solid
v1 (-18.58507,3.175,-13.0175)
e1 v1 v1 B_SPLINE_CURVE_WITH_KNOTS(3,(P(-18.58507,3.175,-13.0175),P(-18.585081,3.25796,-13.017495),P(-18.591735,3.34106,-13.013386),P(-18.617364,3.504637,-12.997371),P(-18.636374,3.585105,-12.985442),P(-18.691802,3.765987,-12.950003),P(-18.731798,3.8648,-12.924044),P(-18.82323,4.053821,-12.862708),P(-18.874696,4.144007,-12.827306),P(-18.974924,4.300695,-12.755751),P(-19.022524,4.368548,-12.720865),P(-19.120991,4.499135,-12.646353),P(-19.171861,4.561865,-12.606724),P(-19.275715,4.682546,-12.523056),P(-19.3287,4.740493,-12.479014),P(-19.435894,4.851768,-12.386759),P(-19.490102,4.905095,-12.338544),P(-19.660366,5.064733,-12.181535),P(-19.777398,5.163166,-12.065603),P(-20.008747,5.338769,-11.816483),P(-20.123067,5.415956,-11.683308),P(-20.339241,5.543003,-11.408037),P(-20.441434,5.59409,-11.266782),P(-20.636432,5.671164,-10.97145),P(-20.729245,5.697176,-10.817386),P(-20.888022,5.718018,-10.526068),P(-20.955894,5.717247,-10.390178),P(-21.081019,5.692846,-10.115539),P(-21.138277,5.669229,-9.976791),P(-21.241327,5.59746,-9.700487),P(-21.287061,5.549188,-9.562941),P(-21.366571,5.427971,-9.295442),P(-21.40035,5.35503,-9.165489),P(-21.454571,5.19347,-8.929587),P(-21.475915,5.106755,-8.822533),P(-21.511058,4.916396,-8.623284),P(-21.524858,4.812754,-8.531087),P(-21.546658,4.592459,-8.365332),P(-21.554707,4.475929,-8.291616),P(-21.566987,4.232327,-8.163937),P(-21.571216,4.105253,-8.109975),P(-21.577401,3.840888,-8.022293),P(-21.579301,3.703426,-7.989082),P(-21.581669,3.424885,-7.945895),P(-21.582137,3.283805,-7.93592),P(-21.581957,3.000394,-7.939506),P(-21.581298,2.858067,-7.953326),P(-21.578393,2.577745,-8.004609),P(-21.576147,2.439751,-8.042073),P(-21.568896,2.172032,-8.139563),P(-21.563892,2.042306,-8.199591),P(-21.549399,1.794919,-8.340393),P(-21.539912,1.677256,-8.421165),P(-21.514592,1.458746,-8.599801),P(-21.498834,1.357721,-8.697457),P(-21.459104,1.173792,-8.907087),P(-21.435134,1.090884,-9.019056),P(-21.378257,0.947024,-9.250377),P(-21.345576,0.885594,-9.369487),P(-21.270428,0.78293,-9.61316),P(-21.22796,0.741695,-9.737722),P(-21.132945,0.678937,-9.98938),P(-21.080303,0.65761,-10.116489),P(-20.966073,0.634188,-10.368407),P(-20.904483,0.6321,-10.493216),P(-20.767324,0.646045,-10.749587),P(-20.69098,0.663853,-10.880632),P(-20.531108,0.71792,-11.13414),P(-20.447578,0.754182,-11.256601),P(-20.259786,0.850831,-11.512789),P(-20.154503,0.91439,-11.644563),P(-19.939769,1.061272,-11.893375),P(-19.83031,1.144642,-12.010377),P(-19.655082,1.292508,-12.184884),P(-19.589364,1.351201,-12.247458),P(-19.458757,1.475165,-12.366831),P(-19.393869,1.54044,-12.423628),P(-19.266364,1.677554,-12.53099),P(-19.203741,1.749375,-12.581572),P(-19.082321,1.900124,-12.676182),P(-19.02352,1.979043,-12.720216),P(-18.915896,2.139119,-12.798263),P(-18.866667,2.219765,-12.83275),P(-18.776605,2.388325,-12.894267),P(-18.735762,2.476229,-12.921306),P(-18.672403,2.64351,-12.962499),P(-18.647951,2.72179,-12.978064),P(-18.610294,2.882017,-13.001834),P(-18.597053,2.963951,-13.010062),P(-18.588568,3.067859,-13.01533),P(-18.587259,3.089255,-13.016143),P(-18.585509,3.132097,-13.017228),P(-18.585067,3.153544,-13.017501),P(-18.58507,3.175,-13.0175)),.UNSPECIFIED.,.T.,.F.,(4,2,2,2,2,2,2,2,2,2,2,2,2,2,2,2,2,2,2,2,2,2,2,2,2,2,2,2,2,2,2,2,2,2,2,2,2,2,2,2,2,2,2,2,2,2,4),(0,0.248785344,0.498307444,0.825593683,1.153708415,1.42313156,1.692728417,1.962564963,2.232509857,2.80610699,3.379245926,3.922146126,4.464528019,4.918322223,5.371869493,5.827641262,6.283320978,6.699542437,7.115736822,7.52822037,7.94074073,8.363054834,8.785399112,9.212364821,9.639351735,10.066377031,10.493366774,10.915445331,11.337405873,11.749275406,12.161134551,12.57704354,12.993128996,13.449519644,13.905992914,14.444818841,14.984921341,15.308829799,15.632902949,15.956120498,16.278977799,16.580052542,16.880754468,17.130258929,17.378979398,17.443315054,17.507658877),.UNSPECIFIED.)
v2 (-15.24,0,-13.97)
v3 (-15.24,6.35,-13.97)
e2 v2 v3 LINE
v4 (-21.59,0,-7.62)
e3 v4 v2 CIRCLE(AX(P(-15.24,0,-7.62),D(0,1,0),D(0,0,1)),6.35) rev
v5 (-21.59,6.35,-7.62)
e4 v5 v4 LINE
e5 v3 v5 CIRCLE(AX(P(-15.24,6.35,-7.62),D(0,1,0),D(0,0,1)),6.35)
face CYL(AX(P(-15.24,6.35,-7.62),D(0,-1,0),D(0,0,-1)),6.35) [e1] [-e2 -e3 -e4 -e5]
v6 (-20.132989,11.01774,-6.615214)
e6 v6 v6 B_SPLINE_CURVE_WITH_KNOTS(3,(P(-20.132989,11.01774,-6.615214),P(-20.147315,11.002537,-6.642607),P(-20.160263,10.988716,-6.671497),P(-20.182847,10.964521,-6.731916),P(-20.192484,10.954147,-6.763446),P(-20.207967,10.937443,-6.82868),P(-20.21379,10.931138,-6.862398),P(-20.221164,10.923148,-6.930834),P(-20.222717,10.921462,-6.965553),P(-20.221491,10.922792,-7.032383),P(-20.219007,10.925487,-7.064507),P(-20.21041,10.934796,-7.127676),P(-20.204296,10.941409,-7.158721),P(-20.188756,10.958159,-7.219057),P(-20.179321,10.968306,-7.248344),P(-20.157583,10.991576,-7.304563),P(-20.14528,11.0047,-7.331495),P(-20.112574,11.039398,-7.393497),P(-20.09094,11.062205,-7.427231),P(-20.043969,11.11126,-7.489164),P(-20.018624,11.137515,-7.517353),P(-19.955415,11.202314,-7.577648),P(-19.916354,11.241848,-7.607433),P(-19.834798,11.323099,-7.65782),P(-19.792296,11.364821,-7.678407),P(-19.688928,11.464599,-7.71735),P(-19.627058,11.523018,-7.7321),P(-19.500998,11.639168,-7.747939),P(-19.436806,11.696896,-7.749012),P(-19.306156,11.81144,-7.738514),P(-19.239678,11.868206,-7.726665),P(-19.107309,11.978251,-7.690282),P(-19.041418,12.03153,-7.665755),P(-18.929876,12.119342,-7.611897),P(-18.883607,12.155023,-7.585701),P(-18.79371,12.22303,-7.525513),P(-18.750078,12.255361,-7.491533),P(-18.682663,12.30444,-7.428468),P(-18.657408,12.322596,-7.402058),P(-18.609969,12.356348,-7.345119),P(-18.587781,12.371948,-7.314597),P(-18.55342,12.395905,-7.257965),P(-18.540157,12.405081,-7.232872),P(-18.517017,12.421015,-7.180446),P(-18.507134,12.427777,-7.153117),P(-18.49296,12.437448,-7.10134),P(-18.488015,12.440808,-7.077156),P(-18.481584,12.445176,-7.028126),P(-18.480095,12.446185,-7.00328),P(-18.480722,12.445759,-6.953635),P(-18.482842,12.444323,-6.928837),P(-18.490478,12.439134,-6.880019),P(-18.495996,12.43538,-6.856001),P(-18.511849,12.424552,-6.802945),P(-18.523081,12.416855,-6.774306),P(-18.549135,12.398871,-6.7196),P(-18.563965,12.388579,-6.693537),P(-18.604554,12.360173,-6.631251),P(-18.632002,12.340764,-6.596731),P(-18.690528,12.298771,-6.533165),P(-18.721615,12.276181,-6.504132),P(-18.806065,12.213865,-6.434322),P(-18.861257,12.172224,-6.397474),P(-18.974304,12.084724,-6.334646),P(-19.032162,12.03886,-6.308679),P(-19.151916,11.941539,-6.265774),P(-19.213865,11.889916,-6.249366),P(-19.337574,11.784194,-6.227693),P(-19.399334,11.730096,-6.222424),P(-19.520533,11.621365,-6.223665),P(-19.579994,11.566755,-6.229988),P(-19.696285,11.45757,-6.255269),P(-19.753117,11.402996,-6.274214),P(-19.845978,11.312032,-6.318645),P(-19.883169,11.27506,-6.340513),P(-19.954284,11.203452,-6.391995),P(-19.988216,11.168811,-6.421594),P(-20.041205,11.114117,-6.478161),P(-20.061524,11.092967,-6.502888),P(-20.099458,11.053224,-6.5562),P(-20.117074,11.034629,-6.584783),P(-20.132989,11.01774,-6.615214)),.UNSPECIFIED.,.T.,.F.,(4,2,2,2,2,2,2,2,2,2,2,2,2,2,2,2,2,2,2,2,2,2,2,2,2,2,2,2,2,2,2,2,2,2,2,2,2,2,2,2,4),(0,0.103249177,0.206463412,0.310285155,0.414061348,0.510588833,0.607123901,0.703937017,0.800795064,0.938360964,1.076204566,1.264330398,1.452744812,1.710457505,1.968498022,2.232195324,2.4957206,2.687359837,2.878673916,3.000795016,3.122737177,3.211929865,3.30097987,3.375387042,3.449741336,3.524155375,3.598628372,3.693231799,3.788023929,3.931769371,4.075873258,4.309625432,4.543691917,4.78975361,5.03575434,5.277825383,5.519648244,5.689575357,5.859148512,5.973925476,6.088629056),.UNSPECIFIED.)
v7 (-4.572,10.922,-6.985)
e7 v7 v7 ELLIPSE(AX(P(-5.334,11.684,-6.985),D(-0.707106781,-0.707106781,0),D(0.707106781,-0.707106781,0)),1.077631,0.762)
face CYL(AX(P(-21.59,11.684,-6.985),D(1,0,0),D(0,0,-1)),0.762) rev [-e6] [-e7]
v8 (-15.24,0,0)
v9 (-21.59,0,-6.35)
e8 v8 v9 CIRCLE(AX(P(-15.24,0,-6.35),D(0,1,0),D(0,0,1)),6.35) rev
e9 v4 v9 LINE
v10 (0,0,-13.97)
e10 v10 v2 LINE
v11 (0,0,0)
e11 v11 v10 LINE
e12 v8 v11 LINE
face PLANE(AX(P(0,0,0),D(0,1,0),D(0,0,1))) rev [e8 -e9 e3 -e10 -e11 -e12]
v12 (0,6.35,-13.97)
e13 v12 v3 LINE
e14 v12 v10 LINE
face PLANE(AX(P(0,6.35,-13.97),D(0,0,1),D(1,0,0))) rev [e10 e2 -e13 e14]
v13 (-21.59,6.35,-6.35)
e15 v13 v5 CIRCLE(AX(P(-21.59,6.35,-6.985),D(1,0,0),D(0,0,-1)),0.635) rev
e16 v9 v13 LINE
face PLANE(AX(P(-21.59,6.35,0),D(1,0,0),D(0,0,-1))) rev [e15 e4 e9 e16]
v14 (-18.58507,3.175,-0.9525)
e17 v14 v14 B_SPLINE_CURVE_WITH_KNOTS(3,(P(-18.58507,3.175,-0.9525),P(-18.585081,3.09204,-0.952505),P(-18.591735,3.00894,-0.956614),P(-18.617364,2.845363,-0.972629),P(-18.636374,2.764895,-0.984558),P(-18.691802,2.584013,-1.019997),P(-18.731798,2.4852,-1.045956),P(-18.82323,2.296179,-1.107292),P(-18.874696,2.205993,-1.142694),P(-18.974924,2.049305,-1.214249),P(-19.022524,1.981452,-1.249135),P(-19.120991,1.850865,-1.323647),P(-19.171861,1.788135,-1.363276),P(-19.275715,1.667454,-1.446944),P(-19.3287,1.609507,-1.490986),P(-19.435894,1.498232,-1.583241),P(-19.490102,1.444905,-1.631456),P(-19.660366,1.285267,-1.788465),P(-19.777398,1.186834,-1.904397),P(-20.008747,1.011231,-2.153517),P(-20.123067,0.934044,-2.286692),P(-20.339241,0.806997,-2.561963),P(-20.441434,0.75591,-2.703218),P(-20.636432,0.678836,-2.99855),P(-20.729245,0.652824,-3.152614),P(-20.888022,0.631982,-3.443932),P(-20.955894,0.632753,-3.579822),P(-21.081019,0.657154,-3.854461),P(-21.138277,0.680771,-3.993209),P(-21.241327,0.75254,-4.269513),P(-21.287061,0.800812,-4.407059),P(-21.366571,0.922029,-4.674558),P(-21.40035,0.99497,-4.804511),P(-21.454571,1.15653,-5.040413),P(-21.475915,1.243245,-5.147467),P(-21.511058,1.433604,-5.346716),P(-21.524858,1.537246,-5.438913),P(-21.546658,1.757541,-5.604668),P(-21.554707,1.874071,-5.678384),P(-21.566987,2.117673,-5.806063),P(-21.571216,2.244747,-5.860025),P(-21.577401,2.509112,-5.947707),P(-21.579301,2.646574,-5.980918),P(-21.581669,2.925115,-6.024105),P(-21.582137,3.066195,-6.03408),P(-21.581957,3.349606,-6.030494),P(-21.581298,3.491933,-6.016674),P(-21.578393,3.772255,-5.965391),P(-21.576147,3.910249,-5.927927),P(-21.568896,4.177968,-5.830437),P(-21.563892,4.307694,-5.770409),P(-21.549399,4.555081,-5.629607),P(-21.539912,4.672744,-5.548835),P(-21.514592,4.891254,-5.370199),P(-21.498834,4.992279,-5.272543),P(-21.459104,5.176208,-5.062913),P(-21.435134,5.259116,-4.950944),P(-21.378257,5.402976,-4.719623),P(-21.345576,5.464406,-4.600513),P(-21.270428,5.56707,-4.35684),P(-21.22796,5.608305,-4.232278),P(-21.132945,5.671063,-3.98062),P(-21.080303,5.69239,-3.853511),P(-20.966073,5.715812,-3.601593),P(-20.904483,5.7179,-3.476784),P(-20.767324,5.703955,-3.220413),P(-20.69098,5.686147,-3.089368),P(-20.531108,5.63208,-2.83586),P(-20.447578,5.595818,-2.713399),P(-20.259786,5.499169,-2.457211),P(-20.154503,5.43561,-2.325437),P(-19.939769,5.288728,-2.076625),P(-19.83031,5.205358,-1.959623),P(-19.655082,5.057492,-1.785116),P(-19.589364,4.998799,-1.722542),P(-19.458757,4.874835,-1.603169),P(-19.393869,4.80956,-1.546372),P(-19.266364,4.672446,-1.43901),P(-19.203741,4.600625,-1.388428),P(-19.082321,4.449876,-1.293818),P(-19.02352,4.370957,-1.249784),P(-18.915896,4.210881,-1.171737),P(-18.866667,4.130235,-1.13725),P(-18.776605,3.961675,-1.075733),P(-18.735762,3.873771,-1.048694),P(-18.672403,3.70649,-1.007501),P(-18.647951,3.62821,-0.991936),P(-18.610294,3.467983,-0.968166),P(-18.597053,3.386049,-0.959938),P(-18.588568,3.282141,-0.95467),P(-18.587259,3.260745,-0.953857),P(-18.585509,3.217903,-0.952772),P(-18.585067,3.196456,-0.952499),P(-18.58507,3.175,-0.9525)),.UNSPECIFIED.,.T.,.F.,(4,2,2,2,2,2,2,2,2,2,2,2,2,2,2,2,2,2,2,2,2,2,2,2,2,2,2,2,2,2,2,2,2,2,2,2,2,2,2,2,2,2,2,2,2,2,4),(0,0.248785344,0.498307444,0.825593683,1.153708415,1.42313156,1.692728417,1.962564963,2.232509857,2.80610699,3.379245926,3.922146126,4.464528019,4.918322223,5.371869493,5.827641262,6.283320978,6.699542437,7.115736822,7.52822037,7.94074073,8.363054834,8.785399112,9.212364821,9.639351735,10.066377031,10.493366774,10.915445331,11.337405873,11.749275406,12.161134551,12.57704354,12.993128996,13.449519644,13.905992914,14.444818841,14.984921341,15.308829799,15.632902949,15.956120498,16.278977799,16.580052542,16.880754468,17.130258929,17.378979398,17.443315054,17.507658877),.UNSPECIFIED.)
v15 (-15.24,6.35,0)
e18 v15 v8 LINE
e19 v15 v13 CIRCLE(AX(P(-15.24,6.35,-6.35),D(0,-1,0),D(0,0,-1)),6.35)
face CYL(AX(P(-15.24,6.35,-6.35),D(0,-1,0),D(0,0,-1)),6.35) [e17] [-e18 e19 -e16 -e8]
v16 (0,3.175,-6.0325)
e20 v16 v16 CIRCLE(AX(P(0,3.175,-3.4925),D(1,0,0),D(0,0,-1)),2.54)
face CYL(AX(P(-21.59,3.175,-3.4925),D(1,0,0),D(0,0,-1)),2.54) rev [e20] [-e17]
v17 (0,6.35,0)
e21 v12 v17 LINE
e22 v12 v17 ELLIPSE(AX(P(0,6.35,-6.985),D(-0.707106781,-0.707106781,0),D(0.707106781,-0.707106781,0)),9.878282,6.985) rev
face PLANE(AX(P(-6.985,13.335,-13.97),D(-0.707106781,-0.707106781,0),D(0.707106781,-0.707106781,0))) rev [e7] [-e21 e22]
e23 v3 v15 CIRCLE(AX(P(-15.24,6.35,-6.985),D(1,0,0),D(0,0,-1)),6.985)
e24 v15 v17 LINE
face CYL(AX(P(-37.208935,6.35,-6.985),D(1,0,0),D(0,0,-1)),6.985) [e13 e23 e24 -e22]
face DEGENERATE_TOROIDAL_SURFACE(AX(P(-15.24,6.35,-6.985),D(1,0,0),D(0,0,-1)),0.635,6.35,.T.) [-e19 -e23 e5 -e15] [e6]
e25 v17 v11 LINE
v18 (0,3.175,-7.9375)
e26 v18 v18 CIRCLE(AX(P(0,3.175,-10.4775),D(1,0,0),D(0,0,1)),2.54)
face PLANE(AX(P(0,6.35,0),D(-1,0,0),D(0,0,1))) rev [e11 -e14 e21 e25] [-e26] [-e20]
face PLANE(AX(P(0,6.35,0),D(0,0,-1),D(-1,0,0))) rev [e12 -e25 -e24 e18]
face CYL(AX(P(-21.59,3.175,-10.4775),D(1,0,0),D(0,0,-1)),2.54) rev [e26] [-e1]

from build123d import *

# Parameters (mm, degrees)
SKETCH1_W              = 21.59
SKETCH1_H              = 13.97
DEPTH_A_DEPTH          = 6.35
ROUND_EXTRUDE_DEPTH    = 21.59
ANGLE_CUT_DEPTH        = 29.967416609
STRING_HOLE_R          = 0.762
STRING_HOLE_CUT_DEPTH  = 29.967416609
ELASTIC_HOLES_R        = 2.54
ELASTIC_HOLE_CUT_DEPTH = 29.967416609
FILLET1_R              = 6.35


with BuildPart() as part:
    # Sketch1 → depth a (new body)
    with BuildSketch(Plane(origin=(0, 0, 0), x_dir=(1, 0, 0), z_dir=(0, 1, 0))):
        with Locations((-10.795, 6.985)):
            Rectangle(SKETCH1_W, SKETCH1_H)
    extrude(amount=DEPTH_A_DEPTH)

    # Sketch4 → round extrude (add)
    with BuildSketch(Plane(origin=(0, 0, 0), x_dir=(0, 0, -1), z_dir=(1, 0, 0))):
        with BuildLine():
            Line((0, 6.35), (13.97, 6.35))
            ThreePointArc((13.97, 6.35), (6.985, 13.335), (0, 6.35))
        make_face()
    extrude(amount=-ROUND_EXTRUDE_DEPTH)

    # Sketch5 → angle cut (cut, through all)
    with BuildSketch(Plane.XY):
        Polygon((0, 6.35), (0, 13.335), (-6.985, 13.335), align=None)
    extrude(amount=-ANGLE_CUT_DEPTH, mode=Mode.SUBTRACT)

    # string hole → string hole cut (cut, through all)
    with BuildSketch(Plane(origin=(0, 0, 0), x_dir=(0, 0, -1), z_dir=(1, 0, 0))):
        with Locations((6.985, 11.684)):
            Circle(STRING_HOLE_R)
    extrude(amount=-STRING_HOLE_CUT_DEPTH, mode=Mode.SUBTRACT)

    # elastic holes → elastic hole cut (cut, through all)
    with BuildSketch(Plane(origin=(0, 0, 0), x_dir=(0, 0, -1), z_dir=(1, 0, 0))):
        with Locations((3.4925, 3.175)):
            Circle(ELASTIC_HOLES_R)
        with Locations(Location((10.4775, 3.175, 0), (0, 0, 180))):
            Circle(ELASTIC_HOLES_R)
    extrude(amount=-ELASTIC_HOLE_CUT_DEPTH, mode=Mode.SUBTRACT)

    # Fillet1
    # the kernel refuses this fillet: 6.35 mm, written as the material it takes off along each edge
    with BuildSketch(Plane(origin=(-21.59, 6.35, -6.985), x_dir=(0, 0, -1), z_dir=(0, -1, 0))) as fillet1_piece_1:
        with BuildLine():
            CenterArc((6.985 - FILLET1_R, FILLET1_R), FILLET1_R, 270, 90)
            Line((6.985, FILLET1_R), (6.985, 0))
            Line((6.985, 0), (6.985 - FILLET1_R, 0))
        make_face()
    revolve(axis=Axis((-21.59, 6.35, -6.985), (1, 0, 0)), revolution_arc=180, mode=Mode.SUBTRACT)
    with BuildSketch(Plane(origin=(-21.59, -15.875, 0), x_dir=(1, 0, 0), z_dir=(0, 1, 0)), Plane(origin=(-21.59, -15.875, -13.97), x_dir=(0, 0, 1), z_dir=(0, 1, 0))) as fillet1_piece_2:
        with BuildLine():
            CenterArc((FILLET1_R, FILLET1_R), FILLET1_R, 180, 90)
            Line((0, FILLET1_R), (0, 0))
            Line((0, 0), (FILLET1_R, 0))
        make_face()
    extrude(amount=22.225, mode=Mode.SUBTRACT)


solid = part.part
